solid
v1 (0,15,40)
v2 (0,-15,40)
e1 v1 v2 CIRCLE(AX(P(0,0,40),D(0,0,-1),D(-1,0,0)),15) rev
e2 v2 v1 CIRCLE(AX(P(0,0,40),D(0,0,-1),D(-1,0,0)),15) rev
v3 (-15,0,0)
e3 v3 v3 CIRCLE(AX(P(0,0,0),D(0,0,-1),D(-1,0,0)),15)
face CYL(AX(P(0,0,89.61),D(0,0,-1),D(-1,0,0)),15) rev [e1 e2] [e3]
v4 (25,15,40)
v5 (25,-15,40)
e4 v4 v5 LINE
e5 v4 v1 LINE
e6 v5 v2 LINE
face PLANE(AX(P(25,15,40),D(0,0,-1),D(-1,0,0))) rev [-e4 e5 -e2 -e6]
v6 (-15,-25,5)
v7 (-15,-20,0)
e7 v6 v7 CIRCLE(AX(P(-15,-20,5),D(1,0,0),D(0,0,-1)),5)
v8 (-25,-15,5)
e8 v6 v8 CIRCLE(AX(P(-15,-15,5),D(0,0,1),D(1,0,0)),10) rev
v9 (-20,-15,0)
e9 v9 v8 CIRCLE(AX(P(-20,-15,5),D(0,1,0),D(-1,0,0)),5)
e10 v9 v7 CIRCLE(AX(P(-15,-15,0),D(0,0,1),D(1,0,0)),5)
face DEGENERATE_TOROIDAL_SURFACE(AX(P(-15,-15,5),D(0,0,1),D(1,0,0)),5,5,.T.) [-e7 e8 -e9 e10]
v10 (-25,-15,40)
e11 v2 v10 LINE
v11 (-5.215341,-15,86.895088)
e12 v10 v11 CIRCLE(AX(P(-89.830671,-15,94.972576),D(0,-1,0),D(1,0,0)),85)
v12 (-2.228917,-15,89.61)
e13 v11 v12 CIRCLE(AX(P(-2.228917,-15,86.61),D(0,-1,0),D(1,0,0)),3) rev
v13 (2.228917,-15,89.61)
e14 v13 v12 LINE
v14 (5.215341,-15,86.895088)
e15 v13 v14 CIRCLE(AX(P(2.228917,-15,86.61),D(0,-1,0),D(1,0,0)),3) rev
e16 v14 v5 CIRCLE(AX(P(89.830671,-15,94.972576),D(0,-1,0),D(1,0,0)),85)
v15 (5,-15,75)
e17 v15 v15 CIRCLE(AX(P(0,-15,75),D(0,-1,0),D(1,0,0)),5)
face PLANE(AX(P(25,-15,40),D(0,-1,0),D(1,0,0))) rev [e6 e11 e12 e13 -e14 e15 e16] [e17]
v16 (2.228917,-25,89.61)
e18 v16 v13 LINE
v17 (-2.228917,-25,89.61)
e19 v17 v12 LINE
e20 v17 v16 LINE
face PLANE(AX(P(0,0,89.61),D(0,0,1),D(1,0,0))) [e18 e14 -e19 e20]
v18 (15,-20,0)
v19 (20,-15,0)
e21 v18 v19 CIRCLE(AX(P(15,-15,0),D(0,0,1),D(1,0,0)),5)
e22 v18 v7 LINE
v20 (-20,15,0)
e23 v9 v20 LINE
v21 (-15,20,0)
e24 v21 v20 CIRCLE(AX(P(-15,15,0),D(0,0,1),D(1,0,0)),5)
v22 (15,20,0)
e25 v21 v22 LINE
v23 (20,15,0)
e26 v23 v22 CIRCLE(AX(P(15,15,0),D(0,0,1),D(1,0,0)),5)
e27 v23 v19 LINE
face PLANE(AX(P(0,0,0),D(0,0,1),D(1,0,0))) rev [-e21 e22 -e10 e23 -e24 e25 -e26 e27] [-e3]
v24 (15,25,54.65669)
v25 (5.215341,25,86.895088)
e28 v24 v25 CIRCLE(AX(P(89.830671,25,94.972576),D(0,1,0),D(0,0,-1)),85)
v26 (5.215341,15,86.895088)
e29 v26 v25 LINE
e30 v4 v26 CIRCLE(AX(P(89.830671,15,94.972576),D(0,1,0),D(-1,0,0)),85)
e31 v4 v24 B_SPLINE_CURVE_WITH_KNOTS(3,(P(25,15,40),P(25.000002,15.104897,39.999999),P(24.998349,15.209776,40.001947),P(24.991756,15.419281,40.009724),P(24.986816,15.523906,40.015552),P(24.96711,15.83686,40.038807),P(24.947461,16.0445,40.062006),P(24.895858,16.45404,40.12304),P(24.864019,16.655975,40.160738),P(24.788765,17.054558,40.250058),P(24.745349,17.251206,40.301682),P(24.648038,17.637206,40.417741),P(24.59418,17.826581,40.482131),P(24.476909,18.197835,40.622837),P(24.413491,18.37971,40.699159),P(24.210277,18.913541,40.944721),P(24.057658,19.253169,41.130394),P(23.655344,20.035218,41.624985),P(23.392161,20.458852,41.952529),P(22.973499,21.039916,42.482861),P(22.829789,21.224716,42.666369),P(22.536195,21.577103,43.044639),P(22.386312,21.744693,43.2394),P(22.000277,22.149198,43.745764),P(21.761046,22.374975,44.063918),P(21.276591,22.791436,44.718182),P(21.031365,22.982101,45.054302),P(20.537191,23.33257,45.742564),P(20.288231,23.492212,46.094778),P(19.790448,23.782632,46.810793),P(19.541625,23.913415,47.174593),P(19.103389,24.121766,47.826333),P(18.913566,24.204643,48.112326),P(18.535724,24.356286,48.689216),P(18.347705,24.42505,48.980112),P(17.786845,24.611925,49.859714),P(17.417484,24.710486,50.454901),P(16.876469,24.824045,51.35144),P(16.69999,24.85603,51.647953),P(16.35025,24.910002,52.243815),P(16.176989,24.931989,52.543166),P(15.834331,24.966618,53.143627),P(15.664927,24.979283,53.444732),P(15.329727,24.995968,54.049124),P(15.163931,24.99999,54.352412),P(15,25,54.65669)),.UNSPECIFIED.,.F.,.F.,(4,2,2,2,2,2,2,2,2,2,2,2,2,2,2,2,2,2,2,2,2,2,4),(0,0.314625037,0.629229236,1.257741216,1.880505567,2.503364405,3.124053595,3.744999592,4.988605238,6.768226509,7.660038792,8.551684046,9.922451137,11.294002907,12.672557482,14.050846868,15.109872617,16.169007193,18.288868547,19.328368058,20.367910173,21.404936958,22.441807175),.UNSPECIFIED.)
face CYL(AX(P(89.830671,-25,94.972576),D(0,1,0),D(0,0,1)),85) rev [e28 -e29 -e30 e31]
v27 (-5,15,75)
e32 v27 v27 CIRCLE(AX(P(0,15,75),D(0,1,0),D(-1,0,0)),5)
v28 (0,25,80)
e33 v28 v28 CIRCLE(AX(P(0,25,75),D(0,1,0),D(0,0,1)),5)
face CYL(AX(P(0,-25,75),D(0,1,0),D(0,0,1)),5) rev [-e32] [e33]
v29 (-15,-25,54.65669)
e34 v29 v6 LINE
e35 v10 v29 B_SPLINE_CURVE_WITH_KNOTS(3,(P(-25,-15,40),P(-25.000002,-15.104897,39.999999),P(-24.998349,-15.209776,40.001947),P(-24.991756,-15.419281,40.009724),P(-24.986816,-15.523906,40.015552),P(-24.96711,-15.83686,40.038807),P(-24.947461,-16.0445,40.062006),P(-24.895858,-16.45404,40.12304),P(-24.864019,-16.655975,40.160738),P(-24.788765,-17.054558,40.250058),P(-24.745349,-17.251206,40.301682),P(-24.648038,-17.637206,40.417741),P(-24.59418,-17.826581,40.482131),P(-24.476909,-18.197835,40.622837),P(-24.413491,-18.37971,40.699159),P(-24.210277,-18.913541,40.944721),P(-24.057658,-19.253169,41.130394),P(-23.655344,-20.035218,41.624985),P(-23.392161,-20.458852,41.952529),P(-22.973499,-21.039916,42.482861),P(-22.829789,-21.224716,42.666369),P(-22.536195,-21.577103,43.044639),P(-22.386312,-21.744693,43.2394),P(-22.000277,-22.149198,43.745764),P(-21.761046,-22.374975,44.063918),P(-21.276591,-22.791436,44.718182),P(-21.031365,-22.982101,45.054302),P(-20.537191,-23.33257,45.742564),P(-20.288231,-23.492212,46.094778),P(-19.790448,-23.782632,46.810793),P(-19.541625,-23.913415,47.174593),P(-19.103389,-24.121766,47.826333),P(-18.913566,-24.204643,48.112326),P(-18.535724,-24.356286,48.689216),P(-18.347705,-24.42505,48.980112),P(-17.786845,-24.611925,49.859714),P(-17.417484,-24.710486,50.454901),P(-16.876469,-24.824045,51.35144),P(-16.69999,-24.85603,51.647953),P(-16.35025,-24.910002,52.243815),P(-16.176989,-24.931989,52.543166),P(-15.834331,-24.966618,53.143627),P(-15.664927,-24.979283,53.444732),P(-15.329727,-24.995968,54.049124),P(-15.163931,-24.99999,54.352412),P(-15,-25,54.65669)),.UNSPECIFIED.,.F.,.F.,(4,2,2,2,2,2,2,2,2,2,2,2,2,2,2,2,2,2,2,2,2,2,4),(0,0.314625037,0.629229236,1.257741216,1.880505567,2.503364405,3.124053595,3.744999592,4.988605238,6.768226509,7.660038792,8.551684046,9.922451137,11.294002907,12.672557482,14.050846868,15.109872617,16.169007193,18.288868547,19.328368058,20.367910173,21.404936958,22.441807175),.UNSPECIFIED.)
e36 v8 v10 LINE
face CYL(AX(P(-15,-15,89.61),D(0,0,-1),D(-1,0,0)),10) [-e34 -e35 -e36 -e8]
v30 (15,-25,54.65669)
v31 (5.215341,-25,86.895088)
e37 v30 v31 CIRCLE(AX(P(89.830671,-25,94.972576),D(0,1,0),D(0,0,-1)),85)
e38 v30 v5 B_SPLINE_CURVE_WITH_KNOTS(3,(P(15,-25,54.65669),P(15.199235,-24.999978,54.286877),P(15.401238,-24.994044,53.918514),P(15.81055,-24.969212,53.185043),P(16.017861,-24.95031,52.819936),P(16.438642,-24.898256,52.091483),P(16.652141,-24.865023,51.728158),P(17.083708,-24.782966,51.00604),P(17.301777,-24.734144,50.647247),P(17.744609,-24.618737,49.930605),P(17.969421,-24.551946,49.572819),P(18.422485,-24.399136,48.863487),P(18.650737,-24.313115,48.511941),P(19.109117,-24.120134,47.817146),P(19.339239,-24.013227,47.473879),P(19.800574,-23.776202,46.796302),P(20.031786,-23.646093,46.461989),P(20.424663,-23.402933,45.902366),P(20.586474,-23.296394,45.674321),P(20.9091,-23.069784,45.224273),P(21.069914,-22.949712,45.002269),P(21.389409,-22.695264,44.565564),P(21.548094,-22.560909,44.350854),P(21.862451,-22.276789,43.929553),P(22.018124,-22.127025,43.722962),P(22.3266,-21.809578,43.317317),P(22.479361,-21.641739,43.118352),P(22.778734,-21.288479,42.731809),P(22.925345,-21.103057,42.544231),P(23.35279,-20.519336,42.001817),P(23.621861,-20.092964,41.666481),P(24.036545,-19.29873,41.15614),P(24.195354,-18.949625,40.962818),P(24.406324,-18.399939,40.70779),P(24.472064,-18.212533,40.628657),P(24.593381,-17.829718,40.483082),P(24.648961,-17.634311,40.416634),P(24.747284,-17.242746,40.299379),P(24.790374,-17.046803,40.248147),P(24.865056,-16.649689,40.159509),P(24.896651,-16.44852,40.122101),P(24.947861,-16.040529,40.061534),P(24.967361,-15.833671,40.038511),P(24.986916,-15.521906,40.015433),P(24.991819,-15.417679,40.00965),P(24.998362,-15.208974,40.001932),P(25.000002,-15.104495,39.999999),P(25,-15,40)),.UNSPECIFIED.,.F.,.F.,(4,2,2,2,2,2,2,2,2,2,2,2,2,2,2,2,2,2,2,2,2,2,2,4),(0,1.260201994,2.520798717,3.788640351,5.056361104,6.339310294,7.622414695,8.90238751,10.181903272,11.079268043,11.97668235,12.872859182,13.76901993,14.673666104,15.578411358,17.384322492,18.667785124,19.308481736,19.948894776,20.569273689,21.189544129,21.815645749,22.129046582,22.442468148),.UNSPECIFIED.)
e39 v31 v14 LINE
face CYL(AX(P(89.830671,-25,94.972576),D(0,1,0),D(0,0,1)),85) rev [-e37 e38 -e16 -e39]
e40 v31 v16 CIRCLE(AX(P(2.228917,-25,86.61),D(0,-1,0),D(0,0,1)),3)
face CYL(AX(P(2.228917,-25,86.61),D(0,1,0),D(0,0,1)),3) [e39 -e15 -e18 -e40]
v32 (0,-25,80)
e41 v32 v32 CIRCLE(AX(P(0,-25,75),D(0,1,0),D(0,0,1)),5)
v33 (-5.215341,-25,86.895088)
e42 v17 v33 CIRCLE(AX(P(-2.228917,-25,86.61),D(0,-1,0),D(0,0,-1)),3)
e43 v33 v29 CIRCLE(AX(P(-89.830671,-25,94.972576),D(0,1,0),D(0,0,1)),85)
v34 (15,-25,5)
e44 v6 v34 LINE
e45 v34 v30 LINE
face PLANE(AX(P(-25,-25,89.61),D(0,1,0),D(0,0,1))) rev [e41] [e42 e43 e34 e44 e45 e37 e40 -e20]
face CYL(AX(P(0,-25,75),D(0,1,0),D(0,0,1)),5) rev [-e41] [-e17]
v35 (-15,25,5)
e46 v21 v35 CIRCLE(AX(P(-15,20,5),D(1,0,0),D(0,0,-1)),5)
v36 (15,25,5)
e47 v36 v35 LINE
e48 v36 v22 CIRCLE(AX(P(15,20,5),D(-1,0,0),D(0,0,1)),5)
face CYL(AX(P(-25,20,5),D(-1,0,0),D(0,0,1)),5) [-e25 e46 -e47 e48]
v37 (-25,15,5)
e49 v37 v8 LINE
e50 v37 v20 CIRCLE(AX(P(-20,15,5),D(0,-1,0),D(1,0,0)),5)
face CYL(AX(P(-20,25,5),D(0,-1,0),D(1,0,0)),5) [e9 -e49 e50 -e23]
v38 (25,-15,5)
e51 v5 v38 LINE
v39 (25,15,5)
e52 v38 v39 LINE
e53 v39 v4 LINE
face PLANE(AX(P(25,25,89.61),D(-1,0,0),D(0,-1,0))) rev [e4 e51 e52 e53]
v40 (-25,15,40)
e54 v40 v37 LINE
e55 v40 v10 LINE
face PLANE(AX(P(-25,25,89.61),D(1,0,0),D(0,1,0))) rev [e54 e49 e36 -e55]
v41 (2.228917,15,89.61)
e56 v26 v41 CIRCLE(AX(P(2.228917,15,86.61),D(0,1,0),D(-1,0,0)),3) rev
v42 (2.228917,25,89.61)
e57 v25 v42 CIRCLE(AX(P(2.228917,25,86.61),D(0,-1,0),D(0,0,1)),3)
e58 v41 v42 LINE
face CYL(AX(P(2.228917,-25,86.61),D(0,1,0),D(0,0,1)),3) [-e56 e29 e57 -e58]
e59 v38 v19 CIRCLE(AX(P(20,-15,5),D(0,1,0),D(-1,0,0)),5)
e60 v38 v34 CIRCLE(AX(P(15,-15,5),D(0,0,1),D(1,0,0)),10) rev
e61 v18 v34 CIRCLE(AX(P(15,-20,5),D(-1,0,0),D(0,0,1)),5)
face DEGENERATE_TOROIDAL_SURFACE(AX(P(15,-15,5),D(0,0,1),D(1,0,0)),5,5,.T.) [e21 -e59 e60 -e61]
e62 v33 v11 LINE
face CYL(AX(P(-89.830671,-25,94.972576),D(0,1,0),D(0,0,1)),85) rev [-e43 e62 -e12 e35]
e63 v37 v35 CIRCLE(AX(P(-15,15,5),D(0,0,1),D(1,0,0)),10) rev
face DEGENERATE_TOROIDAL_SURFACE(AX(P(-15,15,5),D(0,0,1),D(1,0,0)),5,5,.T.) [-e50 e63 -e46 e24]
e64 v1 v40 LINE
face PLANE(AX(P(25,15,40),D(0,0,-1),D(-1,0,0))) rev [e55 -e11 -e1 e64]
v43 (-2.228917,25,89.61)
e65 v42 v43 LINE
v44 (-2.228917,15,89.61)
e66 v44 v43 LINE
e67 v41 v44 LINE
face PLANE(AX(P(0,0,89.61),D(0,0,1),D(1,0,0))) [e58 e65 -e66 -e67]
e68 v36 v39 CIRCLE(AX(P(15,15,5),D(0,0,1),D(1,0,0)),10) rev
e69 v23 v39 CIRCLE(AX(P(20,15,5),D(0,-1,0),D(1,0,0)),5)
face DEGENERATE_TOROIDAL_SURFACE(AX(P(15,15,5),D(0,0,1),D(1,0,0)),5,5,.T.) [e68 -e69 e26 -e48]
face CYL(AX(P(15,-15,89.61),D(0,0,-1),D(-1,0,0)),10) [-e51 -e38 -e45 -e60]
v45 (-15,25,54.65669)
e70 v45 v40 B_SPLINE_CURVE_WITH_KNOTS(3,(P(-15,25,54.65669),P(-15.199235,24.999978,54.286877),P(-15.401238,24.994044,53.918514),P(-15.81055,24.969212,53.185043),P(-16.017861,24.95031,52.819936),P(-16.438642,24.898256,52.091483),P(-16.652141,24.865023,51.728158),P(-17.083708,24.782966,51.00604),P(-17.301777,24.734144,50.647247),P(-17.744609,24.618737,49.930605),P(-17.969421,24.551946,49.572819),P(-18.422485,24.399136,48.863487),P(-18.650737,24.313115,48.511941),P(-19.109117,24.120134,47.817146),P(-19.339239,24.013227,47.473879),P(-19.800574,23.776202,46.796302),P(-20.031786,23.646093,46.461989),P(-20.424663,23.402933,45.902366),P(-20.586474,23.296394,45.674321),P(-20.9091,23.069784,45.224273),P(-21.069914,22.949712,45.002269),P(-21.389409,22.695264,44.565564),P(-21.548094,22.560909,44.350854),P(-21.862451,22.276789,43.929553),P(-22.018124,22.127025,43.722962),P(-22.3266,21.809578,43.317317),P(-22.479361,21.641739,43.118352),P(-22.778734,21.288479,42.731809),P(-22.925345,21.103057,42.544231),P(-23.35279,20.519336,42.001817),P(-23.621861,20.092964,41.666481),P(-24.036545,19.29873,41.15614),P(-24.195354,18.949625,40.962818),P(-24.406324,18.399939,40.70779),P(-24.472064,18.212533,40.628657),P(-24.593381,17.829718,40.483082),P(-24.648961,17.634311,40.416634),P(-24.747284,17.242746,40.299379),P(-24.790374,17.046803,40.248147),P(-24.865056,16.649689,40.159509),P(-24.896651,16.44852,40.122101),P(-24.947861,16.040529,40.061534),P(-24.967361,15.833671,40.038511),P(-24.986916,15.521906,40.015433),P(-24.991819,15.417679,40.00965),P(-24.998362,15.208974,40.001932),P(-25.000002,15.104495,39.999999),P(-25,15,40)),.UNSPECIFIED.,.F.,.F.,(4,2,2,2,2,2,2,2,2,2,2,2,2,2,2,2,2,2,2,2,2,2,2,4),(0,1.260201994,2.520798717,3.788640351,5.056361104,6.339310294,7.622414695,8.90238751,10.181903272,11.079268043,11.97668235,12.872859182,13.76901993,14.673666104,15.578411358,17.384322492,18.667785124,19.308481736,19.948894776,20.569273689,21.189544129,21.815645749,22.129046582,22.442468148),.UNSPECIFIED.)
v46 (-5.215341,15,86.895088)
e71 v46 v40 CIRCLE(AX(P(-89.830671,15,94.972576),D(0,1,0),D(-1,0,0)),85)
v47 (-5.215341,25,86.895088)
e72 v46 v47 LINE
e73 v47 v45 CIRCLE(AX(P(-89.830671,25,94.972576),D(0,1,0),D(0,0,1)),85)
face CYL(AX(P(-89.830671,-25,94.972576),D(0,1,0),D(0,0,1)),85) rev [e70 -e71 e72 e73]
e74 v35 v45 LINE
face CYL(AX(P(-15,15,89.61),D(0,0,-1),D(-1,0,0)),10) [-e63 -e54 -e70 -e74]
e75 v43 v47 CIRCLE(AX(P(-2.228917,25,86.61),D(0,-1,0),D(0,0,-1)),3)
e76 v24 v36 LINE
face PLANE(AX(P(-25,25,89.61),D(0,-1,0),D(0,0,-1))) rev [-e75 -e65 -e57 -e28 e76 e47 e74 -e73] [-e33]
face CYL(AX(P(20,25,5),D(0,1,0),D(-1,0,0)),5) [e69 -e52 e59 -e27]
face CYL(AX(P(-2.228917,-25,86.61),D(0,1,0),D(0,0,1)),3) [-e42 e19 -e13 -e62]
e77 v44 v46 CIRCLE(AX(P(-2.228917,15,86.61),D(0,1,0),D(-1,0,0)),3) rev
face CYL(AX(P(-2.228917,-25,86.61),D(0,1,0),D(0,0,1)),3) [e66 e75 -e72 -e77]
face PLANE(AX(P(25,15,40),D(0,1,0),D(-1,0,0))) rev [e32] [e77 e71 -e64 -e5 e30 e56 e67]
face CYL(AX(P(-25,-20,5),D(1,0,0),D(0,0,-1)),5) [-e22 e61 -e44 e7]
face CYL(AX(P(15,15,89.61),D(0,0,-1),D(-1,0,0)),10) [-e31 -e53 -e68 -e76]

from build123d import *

# Parameters (mm, degrees)
SKETCH1_W           = 50
SKETCH1_H           = 50
BOSS_EXTRUDE1_DEPTH = 89.61
SKETCH2_R           = 15
CUT_EXTRUDE1_DEPTH  = 97.332508013
SKETCH3_W           = 49.61
SKETCH3_H           = 30
CUT_EXTRUDE2_DEPTH  = 106.61700668
FILLET3_R           = 5
FILLET4_R           = 10
SKETCH4_R           = 5
CUT_EXTRUDE3_DEPTH  = 106.61700668


with BuildPart() as part:
    # Sketch1 → Boss-Extrude1 (new body)
    with BuildSketch(Plane.XY):
        Rectangle(SKETCH1_W, SKETCH1_H)
    extrude(amount=BOSS_EXTRUDE1_DEPTH)

    # Sketch2 → Cut-Extrude1 (cut, through all)
    with BuildSketch(Plane(origin=(0, 0, 0), x_dir=(-1, 0, 0), z_dir=(0, 0, -1))):
        Circle(SKETCH2_R)
    extrude(amount=-CUT_EXTRUDE1_DEPTH, mode=Mode.SUBTRACT)

    # Sketch3 → Cut-Extrude2 (cut, through all)
    with BuildSketch(Plane.ZY.offset(25)):
        with Locations((64.805, 0)):
            Rectangle(SKETCH3_W, SKETCH3_H)
    extrude(amount=-CUT_EXTRUDE2_DEPTH, mode=Mode.SUBTRACT)

    # Fillet3
    fillet3_edges = [part.edges().sort_by_distance(p)[0] for p in [
        (0, -25, 0),
        (-25, 0, 0),
        (0, 25, 0),
        (25, 0, 0),
    ]]
    fillet(fillet3_edges, radius=FILLET3_R)

    # Fillet4
    # the kernel refuses this fillet: 10 mm, written as the material it takes off along each edge
    with BuildSketch(Plane(origin=(-15, -15, 0), x_dir=(0, -1, 0), z_dir=(1, 0, 0))) as fillet4_piece_1:
        with BuildLine():
            CenterArc((5, -5), 5, 0, 90)
            Line((10, -5), (10, 0))
            Line((10, 0), (5, 0))
        make_face()
    revolve(axis=Axis((-15, -15, 0), (0, 0, -1)), revolution_arc=90, mode=Mode.SUBTRACT)
    with BuildSketch(Plane(origin=(15, -15, 0), x_dir=(1, 0, 0), z_dir=(0, 1, 0))) as fillet4_piece_2:
        with BuildLine():
            CenterArc((5, -5), 5, 0, 90)
            Line((10, -5), (10, 0))
            Line((10, 0), (5, 0))
        make_face()
    revolve(axis=Axis((15, -15, 0), (0, 0, -1)), revolution_arc=90, mode=Mode.SUBTRACT)
    with BuildSketch(Plane(origin=(15, 15, 0), x_dir=(0, 1, 0), z_dir=(-1, 0, 0))) as fillet4_piece_3:
        with BuildLine():
            CenterArc((5, -5), 5, 0, 90)
            Line((10, -5), (10, 0))
            Line((10, 0), (5, 0))
        make_face()
    revolve(axis=Axis((15, 15, 0), (0, 0, -1)), revolution_arc=90, mode=Mode.SUBTRACT)
    with BuildSketch(Plane(origin=(-15, 15, 0), x_dir=(-1, 0, 0), z_dir=(0, -1, 0))) as fillet4_piece_4:
        with BuildLine():
            CenterArc((5, -5), 5, 0, 90)
            Line((10, -5), (10, 0))
            Line((10, 0), (5, 0))
        make_face()
    revolve(axis=Axis((-15, 15, 0), (0, 0, -1)), revolution_arc=90, mode=Mode.SUBTRACT)
    with BuildSketch(Plane(origin=(-25, 25, 0), x_dir=(1, 0, 0), z_dir=(0, 0, 1)), Plane(origin=(-25, -25, 0), x_dir=(0, 1, 0), z_dir=(0, 0, 1))) as fillet4_piece_5:
        with BuildLine():
            CenterArc((FILLET4_R, -FILLET4_R), FILLET4_R, 90, 90)
            Line((0, -FILLET4_R), (0, 0))
            Line((0, 0), (FILLET4_R, 0))
        make_face()
    extrude(amount=114.61, mode=Mode.SUBTRACT)
    with BuildSketch(Plane(origin=(25, 25, 0), x_dir=(-1, 0, 0), z_dir=(0, 0, 1)), Plane(origin=(25, -25, 0), x_dir=(0, 1, 0), z_dir=(0, 0, 1))) as fillet4_piece_6:
        with BuildLine():
            CenterArc((FILLET4_R, FILLET4_R), FILLET4_R, 180, 90)
            Line((0, FILLET4_R), (0, 0))
            Line((0, 0), (FILLET4_R, 0))
        make_face()
    extrude(amount=114.61, mode=Mode.SUBTRACT)

    # Sketch4 → Cut-Extrude3 (cut, through all)
    with BuildSketch(Plane(origin=(0, 25, 0), x_dir=(1, 0, 0), z_dir=(0, 1, 0))):
        with Locations(Location((0, -75, 0), (0, 0, 270))):
            Circle(SKETCH4_R)
        with BuildLine():
            Line((-2.228917094, -89.61), (2.228917094, -89.61))
            ThreePointArc((2.228917094, -89.61), (4.246928068, -88.829826954), (5.21534053, -86.895087804))
            ThreePointArc((5.21534053, -86.895087804), (11.515192631, -61.931906551), (25, -40))
            add(Edge.make_bspline(
                [(-25, -40), (-88.150639052, -71.432998628), (-33.241224171, -142.040624048), (62.119232947, -121.01307169), (53.993290676, -50.260593277), (25, -40)],
                knots=[0, 0, 0, 0, 0.488610216, 0.657386139, 1, 1, 1, 1], degree=3))
            ThreePointArc((-25, -40), (-11.515192631, -61.931906551), (-5.21534053, -86.895087804))
            ThreePointArc((-5.21534053, -86.895087804), (-4.246928068, -88.829826954), (-2.228917094, -89.61))
        make_face()
    extrude(amount=-CUT_EXTRUDE3_DEPTH, mode=Mode.SUBTRACT)


solid = part.part
